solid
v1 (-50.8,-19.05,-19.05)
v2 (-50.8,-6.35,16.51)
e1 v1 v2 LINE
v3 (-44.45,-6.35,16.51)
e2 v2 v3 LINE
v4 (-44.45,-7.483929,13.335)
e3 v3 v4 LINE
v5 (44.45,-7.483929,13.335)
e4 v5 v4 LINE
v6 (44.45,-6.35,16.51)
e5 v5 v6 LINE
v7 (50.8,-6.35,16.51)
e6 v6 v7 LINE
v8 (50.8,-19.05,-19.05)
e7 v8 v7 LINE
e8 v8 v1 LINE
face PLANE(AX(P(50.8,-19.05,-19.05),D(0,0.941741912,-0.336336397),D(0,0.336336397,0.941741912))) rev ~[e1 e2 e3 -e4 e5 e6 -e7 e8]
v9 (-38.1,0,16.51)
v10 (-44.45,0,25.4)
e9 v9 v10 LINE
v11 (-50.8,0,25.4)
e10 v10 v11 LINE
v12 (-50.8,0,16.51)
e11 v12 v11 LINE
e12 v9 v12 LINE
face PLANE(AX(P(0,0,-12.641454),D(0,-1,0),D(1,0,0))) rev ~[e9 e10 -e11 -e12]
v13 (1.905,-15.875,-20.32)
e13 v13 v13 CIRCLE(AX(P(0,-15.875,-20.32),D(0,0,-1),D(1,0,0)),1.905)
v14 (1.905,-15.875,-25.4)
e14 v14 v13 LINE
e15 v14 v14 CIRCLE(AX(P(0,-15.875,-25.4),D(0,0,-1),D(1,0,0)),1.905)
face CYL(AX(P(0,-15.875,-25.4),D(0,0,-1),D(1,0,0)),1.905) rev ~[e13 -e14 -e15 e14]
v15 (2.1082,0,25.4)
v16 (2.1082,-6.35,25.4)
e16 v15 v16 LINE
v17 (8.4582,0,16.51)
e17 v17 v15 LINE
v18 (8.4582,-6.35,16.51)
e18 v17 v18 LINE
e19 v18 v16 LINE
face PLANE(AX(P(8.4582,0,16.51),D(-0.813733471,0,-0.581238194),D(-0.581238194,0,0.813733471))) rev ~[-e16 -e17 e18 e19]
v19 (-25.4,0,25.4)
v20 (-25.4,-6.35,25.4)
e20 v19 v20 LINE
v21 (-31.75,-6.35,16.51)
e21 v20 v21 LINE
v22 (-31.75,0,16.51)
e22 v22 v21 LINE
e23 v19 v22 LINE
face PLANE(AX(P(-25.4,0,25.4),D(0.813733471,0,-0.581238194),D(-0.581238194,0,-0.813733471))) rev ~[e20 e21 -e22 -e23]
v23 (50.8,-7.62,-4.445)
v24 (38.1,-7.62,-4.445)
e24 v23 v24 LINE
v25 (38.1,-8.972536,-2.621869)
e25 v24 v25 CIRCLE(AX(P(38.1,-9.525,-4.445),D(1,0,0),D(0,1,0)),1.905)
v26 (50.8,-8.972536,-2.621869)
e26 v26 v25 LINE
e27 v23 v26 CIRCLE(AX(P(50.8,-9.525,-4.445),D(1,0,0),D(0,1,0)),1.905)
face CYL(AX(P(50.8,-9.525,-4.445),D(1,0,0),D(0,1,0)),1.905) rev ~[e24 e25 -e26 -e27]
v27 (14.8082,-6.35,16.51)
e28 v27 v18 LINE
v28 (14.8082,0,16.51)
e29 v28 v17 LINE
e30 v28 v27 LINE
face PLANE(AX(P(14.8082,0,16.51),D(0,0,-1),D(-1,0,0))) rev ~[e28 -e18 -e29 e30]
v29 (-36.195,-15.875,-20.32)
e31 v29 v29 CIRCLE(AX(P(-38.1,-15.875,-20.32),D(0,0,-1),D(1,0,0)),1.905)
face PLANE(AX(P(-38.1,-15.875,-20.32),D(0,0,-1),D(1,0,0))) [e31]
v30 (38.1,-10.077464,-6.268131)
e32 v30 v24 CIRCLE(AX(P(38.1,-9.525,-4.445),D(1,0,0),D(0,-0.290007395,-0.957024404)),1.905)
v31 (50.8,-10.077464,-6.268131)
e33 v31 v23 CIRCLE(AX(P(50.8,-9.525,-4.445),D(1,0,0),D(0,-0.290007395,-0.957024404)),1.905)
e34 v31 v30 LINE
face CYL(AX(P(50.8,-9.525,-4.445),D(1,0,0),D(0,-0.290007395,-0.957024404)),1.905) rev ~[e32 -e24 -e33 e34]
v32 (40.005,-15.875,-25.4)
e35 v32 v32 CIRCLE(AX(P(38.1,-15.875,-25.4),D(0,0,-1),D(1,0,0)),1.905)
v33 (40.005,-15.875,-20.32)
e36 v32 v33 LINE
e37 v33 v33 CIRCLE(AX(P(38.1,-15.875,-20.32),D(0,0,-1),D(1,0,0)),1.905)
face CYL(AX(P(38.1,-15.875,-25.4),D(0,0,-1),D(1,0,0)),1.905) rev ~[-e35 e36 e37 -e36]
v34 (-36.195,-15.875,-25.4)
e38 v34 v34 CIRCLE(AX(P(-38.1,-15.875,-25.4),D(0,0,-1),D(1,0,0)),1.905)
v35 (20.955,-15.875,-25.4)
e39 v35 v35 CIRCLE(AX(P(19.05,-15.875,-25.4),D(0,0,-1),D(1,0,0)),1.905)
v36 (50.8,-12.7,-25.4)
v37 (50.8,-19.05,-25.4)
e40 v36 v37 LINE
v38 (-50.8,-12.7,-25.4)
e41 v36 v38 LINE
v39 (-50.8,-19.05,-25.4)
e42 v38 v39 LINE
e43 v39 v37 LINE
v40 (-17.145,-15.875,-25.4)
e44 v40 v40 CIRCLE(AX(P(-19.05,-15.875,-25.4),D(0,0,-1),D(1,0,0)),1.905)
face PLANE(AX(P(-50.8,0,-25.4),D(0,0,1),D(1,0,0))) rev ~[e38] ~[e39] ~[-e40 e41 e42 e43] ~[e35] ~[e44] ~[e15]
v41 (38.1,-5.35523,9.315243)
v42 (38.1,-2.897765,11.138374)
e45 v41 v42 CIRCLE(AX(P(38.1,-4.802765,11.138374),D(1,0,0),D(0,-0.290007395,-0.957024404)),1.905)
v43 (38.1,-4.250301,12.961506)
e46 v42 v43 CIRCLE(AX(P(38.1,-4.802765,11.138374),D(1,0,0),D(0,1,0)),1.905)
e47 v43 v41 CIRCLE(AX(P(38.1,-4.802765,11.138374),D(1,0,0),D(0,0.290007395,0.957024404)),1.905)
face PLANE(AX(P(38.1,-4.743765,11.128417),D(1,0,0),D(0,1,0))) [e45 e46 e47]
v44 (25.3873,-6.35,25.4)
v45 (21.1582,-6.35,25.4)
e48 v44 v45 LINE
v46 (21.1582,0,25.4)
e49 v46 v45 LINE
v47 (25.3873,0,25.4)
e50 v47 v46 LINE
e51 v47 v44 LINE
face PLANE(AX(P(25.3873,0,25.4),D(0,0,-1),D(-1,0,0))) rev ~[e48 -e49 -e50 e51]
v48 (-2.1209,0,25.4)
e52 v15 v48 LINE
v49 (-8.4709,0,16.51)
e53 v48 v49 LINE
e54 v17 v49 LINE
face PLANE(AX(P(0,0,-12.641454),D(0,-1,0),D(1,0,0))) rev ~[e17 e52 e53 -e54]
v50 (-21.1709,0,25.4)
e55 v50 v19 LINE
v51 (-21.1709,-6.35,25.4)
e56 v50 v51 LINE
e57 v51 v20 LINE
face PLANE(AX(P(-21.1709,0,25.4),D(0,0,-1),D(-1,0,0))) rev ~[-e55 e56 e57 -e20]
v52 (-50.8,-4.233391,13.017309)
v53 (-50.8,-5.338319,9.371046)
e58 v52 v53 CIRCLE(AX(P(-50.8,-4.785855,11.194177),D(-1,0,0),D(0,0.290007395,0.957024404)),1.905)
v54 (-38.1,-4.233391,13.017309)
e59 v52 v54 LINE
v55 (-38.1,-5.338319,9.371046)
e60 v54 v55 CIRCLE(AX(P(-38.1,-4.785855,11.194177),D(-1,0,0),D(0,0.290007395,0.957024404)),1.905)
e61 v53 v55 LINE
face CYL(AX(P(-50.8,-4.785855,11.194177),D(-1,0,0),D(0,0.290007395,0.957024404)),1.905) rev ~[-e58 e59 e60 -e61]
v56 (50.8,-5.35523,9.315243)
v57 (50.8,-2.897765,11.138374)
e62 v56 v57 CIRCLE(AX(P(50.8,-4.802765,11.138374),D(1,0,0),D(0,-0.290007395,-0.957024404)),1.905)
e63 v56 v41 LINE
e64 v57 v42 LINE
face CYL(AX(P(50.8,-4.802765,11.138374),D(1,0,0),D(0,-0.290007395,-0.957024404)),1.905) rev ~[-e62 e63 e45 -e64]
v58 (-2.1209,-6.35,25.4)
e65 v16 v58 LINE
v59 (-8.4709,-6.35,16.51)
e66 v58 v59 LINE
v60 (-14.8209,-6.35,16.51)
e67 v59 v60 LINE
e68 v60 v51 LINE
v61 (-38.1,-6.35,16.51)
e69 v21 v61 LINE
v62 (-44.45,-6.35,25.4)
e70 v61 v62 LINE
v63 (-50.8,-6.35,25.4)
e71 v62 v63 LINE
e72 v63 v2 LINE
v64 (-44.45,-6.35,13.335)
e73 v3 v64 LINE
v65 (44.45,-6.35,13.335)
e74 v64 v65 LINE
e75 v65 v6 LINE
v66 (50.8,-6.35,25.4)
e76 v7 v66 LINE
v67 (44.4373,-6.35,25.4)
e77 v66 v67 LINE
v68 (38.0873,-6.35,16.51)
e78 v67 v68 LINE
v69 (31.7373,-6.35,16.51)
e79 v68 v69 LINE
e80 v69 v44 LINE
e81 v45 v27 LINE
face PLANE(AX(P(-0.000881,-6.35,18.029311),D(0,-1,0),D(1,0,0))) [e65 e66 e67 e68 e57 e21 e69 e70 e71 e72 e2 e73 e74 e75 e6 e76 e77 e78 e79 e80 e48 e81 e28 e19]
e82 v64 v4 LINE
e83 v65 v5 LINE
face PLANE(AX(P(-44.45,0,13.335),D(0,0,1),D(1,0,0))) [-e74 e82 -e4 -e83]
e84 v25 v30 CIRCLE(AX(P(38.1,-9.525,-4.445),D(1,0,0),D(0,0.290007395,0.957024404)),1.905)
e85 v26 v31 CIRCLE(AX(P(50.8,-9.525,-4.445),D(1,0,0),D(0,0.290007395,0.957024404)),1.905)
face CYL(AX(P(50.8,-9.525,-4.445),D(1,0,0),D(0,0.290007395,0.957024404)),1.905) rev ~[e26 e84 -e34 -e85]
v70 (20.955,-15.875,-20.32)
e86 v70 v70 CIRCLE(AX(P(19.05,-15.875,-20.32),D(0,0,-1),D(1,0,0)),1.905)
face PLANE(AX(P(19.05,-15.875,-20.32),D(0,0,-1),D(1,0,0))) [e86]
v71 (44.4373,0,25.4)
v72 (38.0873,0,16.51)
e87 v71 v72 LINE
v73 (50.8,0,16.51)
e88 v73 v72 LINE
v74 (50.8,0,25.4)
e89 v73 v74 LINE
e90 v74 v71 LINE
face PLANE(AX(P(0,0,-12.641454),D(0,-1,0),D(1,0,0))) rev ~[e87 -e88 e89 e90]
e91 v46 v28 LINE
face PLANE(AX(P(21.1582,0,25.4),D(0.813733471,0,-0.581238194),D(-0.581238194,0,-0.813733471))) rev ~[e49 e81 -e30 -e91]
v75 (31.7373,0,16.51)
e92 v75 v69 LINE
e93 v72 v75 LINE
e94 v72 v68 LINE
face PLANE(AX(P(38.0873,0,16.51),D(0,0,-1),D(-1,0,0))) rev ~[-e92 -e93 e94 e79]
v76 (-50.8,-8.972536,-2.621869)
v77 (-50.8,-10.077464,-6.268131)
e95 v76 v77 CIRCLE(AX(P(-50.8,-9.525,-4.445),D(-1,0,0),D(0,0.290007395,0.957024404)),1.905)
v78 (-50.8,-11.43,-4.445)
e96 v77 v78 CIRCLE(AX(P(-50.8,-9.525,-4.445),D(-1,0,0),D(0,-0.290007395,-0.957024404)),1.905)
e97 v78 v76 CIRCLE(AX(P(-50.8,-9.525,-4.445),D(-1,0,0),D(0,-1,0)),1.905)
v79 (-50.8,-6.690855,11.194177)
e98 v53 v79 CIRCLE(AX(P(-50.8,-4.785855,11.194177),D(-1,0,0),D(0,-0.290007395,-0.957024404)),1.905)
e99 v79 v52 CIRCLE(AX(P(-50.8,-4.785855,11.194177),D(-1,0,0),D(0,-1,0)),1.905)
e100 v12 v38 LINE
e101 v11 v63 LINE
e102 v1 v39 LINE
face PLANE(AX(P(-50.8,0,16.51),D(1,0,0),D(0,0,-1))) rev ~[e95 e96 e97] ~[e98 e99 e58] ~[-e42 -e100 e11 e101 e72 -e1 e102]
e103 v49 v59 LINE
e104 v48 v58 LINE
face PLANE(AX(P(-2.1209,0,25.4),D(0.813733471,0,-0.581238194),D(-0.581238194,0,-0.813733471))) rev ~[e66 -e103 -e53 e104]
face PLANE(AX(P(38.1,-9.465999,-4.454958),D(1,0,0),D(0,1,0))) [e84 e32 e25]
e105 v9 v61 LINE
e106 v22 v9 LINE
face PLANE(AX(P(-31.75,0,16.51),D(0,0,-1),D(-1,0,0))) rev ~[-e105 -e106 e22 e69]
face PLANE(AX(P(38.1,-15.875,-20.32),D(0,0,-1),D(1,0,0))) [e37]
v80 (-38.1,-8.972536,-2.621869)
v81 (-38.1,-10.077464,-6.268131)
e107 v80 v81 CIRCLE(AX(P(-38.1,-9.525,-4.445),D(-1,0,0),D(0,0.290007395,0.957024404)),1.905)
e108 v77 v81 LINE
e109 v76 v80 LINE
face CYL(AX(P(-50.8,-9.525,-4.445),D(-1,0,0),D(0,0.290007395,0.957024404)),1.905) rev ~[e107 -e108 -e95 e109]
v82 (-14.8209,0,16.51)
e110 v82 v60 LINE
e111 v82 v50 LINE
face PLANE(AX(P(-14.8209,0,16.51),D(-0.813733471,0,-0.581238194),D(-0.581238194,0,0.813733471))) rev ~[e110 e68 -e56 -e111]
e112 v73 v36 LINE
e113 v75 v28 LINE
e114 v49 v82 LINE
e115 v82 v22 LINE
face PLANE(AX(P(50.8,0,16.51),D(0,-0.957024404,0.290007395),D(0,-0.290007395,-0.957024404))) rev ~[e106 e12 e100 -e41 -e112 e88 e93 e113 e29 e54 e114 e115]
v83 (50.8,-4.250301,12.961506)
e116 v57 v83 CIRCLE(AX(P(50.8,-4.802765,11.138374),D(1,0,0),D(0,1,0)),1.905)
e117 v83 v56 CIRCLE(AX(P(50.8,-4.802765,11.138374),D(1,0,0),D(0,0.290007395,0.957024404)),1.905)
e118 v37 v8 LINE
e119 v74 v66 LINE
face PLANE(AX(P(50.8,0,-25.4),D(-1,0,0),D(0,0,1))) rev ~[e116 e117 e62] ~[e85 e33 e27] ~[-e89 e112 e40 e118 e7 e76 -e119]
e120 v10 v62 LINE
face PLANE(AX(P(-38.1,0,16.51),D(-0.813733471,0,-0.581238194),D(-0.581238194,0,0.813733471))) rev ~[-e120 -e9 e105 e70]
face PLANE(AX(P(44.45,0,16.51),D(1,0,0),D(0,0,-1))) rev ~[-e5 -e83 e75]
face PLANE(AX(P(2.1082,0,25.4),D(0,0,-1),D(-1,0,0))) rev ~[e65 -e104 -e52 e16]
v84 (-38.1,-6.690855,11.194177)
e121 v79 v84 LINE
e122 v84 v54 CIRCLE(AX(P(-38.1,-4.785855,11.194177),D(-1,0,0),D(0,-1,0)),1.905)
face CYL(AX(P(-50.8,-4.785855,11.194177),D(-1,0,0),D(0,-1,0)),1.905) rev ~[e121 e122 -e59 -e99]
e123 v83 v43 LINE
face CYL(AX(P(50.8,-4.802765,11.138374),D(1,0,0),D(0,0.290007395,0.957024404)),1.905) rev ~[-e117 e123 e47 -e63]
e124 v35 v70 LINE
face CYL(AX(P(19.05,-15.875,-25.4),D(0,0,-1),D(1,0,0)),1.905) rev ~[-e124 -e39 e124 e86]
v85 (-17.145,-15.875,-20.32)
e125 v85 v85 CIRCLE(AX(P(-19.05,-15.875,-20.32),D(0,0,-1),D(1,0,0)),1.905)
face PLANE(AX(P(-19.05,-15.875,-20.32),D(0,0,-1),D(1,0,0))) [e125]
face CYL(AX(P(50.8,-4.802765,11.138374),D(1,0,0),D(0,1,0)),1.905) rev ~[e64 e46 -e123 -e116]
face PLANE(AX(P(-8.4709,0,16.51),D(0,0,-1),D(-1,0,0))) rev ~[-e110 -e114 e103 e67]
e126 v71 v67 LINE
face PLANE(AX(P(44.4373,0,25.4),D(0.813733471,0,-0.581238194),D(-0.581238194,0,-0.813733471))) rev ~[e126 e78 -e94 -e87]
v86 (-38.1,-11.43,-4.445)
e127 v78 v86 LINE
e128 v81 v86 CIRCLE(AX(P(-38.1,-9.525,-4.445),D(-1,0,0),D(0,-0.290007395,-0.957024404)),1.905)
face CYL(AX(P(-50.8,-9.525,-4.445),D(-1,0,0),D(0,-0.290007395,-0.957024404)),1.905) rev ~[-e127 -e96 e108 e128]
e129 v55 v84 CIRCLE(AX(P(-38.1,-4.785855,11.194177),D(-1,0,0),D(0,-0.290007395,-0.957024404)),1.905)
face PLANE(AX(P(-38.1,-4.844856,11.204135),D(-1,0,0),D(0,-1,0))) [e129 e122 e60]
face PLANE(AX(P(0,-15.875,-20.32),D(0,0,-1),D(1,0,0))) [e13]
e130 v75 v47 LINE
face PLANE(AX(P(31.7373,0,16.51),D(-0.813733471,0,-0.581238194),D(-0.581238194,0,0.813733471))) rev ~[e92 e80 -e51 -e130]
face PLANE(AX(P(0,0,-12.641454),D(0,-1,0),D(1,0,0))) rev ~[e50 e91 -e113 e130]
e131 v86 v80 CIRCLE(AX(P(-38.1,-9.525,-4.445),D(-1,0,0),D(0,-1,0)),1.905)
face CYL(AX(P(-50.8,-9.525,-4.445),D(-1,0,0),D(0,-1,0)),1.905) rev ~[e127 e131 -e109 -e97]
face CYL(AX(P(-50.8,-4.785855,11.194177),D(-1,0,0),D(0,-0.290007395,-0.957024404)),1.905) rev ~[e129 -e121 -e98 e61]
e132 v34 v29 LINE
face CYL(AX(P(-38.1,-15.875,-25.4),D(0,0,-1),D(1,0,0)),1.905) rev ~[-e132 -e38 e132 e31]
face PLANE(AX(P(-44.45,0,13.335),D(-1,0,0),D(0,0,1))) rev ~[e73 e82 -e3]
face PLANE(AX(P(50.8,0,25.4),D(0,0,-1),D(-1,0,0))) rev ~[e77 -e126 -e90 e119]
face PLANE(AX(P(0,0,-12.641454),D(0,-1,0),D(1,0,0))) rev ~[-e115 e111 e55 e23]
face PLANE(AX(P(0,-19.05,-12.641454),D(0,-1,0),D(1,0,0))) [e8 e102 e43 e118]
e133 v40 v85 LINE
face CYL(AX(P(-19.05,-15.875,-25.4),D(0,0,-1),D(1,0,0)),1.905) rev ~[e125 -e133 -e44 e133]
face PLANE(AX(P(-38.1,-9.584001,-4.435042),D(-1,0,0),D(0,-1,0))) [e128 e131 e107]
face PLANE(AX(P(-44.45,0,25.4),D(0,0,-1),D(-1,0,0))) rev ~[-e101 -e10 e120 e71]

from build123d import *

# Parameters (mm, degrees)
F1_DEPTH  = 6.35
F0_W      = 88.9
F0_H      = 32.385
F2_DEPTH  = 19.05
F5_DEPTH  = 101.6
F6_DEPTH  = 12.7
F9_DEPTH  = 12.7
F11_R     = 1.905
F12_DEPTH = 5.08


# Not quite as in the source:
# - a feature names something its author has since deleted; it is built from what else it names


with BuildPart() as f1:
    # F0 (on Front) → F1 (new body)
    with BuildSketch(Plane.XZ):
        Polygon((50.8, 16.51), (50.8, 25.4), (44.4373, 25.4), (38.0873, 16.51), (31.7373, 16.51), (25.3873, 25.4), (21.1582, 25.4), (14.8082, 16.51), (8.4582, 16.51), (2.1082, 25.4), (-2.1209, 25.4), (-8.4709, 16.51), (-14.8209, 16.51), (-21.1709, 25.4), (-25.4, 25.4), (-31.75, 16.51), (-38.1, 16.51), (-44.45, 25.4), (-50.8, 25.4), (-50.8, 16.51), (-44.45, 16.51), (-44.45, 13.335), (44.45, 13.335), (44.45, 16.51), align=None)
    extrude(amount=F1_DEPTH)

    # F0 (on Front) → F2 (join)
    with BuildSketch(Plane.XZ):
        Polygon((50.8, -25.4), (50.8, 16.51), (44.45, 16.51), (44.45, 13.335), (44.45, -19.05), (-44.45, -19.05), (-44.45, 13.335), (-44.45, 16.51), (-50.8, 16.51), (-50.8, -25.4), (-44.45, -25.4), (44.45, -25.4), align=None)
        with Locations((0, -2.8575)):
            Rectangle(F0_W, F0_H)
    extrude(amount=F2_DEPTH)

    # F4 (on offset) → F5 (cut)
    with BuildSketch(Plane.YZ.offset(50.8)):
        Polygon((-12.7, -25.4), (0, -25.4), (0, 16.51), align=None)
        Polygon((-6.35, 16.51), (-6.35, 25.4), (-19.05, 25.4), (-19.05, -19.05), align=None)
    extrude(amount=-F5_DEPTH, mode=Mode.SUBTRACT)

    # F4 (on offset) → F6 (cut)
    with BuildSketch(Plane.YZ.offset(50.8)):
        with BuildLine():
            ThreePointArc((-8.972535912, -2.6218685096), (-11.3481314904, -3.892535912), (-10.077464088, -6.2681314904))
            ThreePointArc((-10.077464088, -6.2681314904), (-8.3899711651, -5.9749459284), (-7.62, -4.445))
            ThreePointArc((-7.62, -4.445), (-7.9950540716, -3.3099711651), (-8.972535912, -2.6218685096))
        make_face()
        with BuildLine():
            ThreePointArc((-2.897765424, 11.1383741007), (-3.2728194956, 12.2734029356), (-4.250301336, 12.9615055911))
            ThreePointArc((-4.250301336, 12.9615055911), (-6.6258969145, 11.6908381887), (-5.3552295121, 9.3152426102))
            ThreePointArc((-5.3552295121, 9.3152426102), (-3.6677365891, 9.6084281723), (-2.897765424, 11.1383741007))
        make_face()
    extrude(amount=-F6_DEPTH, mode=Mode.SUBTRACT)

    # F8 (on offset) → F9 (cut)
    with BuildSketch(Plane(origin=(-50.8, 0, 0), x_dir=(0, -1, 0), z_dir=(-1, 0, 0))):
        with BuildLine():
            ThreePointArc((4.2333912752, 13.0173087917), (2.9627238728, 10.6417132133), (5.3383194513, 9.3710458109))
            ThreePointArc((5.3383194513, 9.3710458109), (6.3158012916, 10.0591484663), (6.6908553632, 11.1941773013))
            ThreePointArc((6.6908553632, 11.1941773013), (5.9208841982, 12.7241232297), (4.2333912752, 13.0173087917))
        make_face()
        with BuildLine():
            ThreePointArc((8.972535912, -2.6218685096), (7.7018685096, -4.997464088), (10.077464088, -6.2681314904))
            ThreePointArc((10.077464088, -6.2681314904), (11.0549459284, -5.5800288349), (11.43, -4.445))
            ThreePointArc((11.43, -4.445), (10.6600288349, -2.9150540716), (8.972535912, -2.6218685096))
        make_face()
    extrude(amount=-F9_DEPTH, mode=Mode.SUBTRACT)

    # F11 (on offset) → F12 (cut)
    with BuildSketch(Plane(origin=(0, 0, -25.4), x_dir=(1, 0, 0), z_dir=(0, 0, -1))):
        with Locations((-38.1, 15.875)):
            Circle(F11_R)
        with Locations((-19.05, 15.875)):
            Circle(F11_R)
        with Locations((0, 15.875)):
            Circle(F11_R)
        with Locations((19.05, 15.875)):
            Circle(F11_R)
        with Locations((38.1, 15.875)):
            Circle(F11_R)
    extrude(amount=-F12_DEPTH, mode=Mode.SUBTRACT)


solid = f1.part
